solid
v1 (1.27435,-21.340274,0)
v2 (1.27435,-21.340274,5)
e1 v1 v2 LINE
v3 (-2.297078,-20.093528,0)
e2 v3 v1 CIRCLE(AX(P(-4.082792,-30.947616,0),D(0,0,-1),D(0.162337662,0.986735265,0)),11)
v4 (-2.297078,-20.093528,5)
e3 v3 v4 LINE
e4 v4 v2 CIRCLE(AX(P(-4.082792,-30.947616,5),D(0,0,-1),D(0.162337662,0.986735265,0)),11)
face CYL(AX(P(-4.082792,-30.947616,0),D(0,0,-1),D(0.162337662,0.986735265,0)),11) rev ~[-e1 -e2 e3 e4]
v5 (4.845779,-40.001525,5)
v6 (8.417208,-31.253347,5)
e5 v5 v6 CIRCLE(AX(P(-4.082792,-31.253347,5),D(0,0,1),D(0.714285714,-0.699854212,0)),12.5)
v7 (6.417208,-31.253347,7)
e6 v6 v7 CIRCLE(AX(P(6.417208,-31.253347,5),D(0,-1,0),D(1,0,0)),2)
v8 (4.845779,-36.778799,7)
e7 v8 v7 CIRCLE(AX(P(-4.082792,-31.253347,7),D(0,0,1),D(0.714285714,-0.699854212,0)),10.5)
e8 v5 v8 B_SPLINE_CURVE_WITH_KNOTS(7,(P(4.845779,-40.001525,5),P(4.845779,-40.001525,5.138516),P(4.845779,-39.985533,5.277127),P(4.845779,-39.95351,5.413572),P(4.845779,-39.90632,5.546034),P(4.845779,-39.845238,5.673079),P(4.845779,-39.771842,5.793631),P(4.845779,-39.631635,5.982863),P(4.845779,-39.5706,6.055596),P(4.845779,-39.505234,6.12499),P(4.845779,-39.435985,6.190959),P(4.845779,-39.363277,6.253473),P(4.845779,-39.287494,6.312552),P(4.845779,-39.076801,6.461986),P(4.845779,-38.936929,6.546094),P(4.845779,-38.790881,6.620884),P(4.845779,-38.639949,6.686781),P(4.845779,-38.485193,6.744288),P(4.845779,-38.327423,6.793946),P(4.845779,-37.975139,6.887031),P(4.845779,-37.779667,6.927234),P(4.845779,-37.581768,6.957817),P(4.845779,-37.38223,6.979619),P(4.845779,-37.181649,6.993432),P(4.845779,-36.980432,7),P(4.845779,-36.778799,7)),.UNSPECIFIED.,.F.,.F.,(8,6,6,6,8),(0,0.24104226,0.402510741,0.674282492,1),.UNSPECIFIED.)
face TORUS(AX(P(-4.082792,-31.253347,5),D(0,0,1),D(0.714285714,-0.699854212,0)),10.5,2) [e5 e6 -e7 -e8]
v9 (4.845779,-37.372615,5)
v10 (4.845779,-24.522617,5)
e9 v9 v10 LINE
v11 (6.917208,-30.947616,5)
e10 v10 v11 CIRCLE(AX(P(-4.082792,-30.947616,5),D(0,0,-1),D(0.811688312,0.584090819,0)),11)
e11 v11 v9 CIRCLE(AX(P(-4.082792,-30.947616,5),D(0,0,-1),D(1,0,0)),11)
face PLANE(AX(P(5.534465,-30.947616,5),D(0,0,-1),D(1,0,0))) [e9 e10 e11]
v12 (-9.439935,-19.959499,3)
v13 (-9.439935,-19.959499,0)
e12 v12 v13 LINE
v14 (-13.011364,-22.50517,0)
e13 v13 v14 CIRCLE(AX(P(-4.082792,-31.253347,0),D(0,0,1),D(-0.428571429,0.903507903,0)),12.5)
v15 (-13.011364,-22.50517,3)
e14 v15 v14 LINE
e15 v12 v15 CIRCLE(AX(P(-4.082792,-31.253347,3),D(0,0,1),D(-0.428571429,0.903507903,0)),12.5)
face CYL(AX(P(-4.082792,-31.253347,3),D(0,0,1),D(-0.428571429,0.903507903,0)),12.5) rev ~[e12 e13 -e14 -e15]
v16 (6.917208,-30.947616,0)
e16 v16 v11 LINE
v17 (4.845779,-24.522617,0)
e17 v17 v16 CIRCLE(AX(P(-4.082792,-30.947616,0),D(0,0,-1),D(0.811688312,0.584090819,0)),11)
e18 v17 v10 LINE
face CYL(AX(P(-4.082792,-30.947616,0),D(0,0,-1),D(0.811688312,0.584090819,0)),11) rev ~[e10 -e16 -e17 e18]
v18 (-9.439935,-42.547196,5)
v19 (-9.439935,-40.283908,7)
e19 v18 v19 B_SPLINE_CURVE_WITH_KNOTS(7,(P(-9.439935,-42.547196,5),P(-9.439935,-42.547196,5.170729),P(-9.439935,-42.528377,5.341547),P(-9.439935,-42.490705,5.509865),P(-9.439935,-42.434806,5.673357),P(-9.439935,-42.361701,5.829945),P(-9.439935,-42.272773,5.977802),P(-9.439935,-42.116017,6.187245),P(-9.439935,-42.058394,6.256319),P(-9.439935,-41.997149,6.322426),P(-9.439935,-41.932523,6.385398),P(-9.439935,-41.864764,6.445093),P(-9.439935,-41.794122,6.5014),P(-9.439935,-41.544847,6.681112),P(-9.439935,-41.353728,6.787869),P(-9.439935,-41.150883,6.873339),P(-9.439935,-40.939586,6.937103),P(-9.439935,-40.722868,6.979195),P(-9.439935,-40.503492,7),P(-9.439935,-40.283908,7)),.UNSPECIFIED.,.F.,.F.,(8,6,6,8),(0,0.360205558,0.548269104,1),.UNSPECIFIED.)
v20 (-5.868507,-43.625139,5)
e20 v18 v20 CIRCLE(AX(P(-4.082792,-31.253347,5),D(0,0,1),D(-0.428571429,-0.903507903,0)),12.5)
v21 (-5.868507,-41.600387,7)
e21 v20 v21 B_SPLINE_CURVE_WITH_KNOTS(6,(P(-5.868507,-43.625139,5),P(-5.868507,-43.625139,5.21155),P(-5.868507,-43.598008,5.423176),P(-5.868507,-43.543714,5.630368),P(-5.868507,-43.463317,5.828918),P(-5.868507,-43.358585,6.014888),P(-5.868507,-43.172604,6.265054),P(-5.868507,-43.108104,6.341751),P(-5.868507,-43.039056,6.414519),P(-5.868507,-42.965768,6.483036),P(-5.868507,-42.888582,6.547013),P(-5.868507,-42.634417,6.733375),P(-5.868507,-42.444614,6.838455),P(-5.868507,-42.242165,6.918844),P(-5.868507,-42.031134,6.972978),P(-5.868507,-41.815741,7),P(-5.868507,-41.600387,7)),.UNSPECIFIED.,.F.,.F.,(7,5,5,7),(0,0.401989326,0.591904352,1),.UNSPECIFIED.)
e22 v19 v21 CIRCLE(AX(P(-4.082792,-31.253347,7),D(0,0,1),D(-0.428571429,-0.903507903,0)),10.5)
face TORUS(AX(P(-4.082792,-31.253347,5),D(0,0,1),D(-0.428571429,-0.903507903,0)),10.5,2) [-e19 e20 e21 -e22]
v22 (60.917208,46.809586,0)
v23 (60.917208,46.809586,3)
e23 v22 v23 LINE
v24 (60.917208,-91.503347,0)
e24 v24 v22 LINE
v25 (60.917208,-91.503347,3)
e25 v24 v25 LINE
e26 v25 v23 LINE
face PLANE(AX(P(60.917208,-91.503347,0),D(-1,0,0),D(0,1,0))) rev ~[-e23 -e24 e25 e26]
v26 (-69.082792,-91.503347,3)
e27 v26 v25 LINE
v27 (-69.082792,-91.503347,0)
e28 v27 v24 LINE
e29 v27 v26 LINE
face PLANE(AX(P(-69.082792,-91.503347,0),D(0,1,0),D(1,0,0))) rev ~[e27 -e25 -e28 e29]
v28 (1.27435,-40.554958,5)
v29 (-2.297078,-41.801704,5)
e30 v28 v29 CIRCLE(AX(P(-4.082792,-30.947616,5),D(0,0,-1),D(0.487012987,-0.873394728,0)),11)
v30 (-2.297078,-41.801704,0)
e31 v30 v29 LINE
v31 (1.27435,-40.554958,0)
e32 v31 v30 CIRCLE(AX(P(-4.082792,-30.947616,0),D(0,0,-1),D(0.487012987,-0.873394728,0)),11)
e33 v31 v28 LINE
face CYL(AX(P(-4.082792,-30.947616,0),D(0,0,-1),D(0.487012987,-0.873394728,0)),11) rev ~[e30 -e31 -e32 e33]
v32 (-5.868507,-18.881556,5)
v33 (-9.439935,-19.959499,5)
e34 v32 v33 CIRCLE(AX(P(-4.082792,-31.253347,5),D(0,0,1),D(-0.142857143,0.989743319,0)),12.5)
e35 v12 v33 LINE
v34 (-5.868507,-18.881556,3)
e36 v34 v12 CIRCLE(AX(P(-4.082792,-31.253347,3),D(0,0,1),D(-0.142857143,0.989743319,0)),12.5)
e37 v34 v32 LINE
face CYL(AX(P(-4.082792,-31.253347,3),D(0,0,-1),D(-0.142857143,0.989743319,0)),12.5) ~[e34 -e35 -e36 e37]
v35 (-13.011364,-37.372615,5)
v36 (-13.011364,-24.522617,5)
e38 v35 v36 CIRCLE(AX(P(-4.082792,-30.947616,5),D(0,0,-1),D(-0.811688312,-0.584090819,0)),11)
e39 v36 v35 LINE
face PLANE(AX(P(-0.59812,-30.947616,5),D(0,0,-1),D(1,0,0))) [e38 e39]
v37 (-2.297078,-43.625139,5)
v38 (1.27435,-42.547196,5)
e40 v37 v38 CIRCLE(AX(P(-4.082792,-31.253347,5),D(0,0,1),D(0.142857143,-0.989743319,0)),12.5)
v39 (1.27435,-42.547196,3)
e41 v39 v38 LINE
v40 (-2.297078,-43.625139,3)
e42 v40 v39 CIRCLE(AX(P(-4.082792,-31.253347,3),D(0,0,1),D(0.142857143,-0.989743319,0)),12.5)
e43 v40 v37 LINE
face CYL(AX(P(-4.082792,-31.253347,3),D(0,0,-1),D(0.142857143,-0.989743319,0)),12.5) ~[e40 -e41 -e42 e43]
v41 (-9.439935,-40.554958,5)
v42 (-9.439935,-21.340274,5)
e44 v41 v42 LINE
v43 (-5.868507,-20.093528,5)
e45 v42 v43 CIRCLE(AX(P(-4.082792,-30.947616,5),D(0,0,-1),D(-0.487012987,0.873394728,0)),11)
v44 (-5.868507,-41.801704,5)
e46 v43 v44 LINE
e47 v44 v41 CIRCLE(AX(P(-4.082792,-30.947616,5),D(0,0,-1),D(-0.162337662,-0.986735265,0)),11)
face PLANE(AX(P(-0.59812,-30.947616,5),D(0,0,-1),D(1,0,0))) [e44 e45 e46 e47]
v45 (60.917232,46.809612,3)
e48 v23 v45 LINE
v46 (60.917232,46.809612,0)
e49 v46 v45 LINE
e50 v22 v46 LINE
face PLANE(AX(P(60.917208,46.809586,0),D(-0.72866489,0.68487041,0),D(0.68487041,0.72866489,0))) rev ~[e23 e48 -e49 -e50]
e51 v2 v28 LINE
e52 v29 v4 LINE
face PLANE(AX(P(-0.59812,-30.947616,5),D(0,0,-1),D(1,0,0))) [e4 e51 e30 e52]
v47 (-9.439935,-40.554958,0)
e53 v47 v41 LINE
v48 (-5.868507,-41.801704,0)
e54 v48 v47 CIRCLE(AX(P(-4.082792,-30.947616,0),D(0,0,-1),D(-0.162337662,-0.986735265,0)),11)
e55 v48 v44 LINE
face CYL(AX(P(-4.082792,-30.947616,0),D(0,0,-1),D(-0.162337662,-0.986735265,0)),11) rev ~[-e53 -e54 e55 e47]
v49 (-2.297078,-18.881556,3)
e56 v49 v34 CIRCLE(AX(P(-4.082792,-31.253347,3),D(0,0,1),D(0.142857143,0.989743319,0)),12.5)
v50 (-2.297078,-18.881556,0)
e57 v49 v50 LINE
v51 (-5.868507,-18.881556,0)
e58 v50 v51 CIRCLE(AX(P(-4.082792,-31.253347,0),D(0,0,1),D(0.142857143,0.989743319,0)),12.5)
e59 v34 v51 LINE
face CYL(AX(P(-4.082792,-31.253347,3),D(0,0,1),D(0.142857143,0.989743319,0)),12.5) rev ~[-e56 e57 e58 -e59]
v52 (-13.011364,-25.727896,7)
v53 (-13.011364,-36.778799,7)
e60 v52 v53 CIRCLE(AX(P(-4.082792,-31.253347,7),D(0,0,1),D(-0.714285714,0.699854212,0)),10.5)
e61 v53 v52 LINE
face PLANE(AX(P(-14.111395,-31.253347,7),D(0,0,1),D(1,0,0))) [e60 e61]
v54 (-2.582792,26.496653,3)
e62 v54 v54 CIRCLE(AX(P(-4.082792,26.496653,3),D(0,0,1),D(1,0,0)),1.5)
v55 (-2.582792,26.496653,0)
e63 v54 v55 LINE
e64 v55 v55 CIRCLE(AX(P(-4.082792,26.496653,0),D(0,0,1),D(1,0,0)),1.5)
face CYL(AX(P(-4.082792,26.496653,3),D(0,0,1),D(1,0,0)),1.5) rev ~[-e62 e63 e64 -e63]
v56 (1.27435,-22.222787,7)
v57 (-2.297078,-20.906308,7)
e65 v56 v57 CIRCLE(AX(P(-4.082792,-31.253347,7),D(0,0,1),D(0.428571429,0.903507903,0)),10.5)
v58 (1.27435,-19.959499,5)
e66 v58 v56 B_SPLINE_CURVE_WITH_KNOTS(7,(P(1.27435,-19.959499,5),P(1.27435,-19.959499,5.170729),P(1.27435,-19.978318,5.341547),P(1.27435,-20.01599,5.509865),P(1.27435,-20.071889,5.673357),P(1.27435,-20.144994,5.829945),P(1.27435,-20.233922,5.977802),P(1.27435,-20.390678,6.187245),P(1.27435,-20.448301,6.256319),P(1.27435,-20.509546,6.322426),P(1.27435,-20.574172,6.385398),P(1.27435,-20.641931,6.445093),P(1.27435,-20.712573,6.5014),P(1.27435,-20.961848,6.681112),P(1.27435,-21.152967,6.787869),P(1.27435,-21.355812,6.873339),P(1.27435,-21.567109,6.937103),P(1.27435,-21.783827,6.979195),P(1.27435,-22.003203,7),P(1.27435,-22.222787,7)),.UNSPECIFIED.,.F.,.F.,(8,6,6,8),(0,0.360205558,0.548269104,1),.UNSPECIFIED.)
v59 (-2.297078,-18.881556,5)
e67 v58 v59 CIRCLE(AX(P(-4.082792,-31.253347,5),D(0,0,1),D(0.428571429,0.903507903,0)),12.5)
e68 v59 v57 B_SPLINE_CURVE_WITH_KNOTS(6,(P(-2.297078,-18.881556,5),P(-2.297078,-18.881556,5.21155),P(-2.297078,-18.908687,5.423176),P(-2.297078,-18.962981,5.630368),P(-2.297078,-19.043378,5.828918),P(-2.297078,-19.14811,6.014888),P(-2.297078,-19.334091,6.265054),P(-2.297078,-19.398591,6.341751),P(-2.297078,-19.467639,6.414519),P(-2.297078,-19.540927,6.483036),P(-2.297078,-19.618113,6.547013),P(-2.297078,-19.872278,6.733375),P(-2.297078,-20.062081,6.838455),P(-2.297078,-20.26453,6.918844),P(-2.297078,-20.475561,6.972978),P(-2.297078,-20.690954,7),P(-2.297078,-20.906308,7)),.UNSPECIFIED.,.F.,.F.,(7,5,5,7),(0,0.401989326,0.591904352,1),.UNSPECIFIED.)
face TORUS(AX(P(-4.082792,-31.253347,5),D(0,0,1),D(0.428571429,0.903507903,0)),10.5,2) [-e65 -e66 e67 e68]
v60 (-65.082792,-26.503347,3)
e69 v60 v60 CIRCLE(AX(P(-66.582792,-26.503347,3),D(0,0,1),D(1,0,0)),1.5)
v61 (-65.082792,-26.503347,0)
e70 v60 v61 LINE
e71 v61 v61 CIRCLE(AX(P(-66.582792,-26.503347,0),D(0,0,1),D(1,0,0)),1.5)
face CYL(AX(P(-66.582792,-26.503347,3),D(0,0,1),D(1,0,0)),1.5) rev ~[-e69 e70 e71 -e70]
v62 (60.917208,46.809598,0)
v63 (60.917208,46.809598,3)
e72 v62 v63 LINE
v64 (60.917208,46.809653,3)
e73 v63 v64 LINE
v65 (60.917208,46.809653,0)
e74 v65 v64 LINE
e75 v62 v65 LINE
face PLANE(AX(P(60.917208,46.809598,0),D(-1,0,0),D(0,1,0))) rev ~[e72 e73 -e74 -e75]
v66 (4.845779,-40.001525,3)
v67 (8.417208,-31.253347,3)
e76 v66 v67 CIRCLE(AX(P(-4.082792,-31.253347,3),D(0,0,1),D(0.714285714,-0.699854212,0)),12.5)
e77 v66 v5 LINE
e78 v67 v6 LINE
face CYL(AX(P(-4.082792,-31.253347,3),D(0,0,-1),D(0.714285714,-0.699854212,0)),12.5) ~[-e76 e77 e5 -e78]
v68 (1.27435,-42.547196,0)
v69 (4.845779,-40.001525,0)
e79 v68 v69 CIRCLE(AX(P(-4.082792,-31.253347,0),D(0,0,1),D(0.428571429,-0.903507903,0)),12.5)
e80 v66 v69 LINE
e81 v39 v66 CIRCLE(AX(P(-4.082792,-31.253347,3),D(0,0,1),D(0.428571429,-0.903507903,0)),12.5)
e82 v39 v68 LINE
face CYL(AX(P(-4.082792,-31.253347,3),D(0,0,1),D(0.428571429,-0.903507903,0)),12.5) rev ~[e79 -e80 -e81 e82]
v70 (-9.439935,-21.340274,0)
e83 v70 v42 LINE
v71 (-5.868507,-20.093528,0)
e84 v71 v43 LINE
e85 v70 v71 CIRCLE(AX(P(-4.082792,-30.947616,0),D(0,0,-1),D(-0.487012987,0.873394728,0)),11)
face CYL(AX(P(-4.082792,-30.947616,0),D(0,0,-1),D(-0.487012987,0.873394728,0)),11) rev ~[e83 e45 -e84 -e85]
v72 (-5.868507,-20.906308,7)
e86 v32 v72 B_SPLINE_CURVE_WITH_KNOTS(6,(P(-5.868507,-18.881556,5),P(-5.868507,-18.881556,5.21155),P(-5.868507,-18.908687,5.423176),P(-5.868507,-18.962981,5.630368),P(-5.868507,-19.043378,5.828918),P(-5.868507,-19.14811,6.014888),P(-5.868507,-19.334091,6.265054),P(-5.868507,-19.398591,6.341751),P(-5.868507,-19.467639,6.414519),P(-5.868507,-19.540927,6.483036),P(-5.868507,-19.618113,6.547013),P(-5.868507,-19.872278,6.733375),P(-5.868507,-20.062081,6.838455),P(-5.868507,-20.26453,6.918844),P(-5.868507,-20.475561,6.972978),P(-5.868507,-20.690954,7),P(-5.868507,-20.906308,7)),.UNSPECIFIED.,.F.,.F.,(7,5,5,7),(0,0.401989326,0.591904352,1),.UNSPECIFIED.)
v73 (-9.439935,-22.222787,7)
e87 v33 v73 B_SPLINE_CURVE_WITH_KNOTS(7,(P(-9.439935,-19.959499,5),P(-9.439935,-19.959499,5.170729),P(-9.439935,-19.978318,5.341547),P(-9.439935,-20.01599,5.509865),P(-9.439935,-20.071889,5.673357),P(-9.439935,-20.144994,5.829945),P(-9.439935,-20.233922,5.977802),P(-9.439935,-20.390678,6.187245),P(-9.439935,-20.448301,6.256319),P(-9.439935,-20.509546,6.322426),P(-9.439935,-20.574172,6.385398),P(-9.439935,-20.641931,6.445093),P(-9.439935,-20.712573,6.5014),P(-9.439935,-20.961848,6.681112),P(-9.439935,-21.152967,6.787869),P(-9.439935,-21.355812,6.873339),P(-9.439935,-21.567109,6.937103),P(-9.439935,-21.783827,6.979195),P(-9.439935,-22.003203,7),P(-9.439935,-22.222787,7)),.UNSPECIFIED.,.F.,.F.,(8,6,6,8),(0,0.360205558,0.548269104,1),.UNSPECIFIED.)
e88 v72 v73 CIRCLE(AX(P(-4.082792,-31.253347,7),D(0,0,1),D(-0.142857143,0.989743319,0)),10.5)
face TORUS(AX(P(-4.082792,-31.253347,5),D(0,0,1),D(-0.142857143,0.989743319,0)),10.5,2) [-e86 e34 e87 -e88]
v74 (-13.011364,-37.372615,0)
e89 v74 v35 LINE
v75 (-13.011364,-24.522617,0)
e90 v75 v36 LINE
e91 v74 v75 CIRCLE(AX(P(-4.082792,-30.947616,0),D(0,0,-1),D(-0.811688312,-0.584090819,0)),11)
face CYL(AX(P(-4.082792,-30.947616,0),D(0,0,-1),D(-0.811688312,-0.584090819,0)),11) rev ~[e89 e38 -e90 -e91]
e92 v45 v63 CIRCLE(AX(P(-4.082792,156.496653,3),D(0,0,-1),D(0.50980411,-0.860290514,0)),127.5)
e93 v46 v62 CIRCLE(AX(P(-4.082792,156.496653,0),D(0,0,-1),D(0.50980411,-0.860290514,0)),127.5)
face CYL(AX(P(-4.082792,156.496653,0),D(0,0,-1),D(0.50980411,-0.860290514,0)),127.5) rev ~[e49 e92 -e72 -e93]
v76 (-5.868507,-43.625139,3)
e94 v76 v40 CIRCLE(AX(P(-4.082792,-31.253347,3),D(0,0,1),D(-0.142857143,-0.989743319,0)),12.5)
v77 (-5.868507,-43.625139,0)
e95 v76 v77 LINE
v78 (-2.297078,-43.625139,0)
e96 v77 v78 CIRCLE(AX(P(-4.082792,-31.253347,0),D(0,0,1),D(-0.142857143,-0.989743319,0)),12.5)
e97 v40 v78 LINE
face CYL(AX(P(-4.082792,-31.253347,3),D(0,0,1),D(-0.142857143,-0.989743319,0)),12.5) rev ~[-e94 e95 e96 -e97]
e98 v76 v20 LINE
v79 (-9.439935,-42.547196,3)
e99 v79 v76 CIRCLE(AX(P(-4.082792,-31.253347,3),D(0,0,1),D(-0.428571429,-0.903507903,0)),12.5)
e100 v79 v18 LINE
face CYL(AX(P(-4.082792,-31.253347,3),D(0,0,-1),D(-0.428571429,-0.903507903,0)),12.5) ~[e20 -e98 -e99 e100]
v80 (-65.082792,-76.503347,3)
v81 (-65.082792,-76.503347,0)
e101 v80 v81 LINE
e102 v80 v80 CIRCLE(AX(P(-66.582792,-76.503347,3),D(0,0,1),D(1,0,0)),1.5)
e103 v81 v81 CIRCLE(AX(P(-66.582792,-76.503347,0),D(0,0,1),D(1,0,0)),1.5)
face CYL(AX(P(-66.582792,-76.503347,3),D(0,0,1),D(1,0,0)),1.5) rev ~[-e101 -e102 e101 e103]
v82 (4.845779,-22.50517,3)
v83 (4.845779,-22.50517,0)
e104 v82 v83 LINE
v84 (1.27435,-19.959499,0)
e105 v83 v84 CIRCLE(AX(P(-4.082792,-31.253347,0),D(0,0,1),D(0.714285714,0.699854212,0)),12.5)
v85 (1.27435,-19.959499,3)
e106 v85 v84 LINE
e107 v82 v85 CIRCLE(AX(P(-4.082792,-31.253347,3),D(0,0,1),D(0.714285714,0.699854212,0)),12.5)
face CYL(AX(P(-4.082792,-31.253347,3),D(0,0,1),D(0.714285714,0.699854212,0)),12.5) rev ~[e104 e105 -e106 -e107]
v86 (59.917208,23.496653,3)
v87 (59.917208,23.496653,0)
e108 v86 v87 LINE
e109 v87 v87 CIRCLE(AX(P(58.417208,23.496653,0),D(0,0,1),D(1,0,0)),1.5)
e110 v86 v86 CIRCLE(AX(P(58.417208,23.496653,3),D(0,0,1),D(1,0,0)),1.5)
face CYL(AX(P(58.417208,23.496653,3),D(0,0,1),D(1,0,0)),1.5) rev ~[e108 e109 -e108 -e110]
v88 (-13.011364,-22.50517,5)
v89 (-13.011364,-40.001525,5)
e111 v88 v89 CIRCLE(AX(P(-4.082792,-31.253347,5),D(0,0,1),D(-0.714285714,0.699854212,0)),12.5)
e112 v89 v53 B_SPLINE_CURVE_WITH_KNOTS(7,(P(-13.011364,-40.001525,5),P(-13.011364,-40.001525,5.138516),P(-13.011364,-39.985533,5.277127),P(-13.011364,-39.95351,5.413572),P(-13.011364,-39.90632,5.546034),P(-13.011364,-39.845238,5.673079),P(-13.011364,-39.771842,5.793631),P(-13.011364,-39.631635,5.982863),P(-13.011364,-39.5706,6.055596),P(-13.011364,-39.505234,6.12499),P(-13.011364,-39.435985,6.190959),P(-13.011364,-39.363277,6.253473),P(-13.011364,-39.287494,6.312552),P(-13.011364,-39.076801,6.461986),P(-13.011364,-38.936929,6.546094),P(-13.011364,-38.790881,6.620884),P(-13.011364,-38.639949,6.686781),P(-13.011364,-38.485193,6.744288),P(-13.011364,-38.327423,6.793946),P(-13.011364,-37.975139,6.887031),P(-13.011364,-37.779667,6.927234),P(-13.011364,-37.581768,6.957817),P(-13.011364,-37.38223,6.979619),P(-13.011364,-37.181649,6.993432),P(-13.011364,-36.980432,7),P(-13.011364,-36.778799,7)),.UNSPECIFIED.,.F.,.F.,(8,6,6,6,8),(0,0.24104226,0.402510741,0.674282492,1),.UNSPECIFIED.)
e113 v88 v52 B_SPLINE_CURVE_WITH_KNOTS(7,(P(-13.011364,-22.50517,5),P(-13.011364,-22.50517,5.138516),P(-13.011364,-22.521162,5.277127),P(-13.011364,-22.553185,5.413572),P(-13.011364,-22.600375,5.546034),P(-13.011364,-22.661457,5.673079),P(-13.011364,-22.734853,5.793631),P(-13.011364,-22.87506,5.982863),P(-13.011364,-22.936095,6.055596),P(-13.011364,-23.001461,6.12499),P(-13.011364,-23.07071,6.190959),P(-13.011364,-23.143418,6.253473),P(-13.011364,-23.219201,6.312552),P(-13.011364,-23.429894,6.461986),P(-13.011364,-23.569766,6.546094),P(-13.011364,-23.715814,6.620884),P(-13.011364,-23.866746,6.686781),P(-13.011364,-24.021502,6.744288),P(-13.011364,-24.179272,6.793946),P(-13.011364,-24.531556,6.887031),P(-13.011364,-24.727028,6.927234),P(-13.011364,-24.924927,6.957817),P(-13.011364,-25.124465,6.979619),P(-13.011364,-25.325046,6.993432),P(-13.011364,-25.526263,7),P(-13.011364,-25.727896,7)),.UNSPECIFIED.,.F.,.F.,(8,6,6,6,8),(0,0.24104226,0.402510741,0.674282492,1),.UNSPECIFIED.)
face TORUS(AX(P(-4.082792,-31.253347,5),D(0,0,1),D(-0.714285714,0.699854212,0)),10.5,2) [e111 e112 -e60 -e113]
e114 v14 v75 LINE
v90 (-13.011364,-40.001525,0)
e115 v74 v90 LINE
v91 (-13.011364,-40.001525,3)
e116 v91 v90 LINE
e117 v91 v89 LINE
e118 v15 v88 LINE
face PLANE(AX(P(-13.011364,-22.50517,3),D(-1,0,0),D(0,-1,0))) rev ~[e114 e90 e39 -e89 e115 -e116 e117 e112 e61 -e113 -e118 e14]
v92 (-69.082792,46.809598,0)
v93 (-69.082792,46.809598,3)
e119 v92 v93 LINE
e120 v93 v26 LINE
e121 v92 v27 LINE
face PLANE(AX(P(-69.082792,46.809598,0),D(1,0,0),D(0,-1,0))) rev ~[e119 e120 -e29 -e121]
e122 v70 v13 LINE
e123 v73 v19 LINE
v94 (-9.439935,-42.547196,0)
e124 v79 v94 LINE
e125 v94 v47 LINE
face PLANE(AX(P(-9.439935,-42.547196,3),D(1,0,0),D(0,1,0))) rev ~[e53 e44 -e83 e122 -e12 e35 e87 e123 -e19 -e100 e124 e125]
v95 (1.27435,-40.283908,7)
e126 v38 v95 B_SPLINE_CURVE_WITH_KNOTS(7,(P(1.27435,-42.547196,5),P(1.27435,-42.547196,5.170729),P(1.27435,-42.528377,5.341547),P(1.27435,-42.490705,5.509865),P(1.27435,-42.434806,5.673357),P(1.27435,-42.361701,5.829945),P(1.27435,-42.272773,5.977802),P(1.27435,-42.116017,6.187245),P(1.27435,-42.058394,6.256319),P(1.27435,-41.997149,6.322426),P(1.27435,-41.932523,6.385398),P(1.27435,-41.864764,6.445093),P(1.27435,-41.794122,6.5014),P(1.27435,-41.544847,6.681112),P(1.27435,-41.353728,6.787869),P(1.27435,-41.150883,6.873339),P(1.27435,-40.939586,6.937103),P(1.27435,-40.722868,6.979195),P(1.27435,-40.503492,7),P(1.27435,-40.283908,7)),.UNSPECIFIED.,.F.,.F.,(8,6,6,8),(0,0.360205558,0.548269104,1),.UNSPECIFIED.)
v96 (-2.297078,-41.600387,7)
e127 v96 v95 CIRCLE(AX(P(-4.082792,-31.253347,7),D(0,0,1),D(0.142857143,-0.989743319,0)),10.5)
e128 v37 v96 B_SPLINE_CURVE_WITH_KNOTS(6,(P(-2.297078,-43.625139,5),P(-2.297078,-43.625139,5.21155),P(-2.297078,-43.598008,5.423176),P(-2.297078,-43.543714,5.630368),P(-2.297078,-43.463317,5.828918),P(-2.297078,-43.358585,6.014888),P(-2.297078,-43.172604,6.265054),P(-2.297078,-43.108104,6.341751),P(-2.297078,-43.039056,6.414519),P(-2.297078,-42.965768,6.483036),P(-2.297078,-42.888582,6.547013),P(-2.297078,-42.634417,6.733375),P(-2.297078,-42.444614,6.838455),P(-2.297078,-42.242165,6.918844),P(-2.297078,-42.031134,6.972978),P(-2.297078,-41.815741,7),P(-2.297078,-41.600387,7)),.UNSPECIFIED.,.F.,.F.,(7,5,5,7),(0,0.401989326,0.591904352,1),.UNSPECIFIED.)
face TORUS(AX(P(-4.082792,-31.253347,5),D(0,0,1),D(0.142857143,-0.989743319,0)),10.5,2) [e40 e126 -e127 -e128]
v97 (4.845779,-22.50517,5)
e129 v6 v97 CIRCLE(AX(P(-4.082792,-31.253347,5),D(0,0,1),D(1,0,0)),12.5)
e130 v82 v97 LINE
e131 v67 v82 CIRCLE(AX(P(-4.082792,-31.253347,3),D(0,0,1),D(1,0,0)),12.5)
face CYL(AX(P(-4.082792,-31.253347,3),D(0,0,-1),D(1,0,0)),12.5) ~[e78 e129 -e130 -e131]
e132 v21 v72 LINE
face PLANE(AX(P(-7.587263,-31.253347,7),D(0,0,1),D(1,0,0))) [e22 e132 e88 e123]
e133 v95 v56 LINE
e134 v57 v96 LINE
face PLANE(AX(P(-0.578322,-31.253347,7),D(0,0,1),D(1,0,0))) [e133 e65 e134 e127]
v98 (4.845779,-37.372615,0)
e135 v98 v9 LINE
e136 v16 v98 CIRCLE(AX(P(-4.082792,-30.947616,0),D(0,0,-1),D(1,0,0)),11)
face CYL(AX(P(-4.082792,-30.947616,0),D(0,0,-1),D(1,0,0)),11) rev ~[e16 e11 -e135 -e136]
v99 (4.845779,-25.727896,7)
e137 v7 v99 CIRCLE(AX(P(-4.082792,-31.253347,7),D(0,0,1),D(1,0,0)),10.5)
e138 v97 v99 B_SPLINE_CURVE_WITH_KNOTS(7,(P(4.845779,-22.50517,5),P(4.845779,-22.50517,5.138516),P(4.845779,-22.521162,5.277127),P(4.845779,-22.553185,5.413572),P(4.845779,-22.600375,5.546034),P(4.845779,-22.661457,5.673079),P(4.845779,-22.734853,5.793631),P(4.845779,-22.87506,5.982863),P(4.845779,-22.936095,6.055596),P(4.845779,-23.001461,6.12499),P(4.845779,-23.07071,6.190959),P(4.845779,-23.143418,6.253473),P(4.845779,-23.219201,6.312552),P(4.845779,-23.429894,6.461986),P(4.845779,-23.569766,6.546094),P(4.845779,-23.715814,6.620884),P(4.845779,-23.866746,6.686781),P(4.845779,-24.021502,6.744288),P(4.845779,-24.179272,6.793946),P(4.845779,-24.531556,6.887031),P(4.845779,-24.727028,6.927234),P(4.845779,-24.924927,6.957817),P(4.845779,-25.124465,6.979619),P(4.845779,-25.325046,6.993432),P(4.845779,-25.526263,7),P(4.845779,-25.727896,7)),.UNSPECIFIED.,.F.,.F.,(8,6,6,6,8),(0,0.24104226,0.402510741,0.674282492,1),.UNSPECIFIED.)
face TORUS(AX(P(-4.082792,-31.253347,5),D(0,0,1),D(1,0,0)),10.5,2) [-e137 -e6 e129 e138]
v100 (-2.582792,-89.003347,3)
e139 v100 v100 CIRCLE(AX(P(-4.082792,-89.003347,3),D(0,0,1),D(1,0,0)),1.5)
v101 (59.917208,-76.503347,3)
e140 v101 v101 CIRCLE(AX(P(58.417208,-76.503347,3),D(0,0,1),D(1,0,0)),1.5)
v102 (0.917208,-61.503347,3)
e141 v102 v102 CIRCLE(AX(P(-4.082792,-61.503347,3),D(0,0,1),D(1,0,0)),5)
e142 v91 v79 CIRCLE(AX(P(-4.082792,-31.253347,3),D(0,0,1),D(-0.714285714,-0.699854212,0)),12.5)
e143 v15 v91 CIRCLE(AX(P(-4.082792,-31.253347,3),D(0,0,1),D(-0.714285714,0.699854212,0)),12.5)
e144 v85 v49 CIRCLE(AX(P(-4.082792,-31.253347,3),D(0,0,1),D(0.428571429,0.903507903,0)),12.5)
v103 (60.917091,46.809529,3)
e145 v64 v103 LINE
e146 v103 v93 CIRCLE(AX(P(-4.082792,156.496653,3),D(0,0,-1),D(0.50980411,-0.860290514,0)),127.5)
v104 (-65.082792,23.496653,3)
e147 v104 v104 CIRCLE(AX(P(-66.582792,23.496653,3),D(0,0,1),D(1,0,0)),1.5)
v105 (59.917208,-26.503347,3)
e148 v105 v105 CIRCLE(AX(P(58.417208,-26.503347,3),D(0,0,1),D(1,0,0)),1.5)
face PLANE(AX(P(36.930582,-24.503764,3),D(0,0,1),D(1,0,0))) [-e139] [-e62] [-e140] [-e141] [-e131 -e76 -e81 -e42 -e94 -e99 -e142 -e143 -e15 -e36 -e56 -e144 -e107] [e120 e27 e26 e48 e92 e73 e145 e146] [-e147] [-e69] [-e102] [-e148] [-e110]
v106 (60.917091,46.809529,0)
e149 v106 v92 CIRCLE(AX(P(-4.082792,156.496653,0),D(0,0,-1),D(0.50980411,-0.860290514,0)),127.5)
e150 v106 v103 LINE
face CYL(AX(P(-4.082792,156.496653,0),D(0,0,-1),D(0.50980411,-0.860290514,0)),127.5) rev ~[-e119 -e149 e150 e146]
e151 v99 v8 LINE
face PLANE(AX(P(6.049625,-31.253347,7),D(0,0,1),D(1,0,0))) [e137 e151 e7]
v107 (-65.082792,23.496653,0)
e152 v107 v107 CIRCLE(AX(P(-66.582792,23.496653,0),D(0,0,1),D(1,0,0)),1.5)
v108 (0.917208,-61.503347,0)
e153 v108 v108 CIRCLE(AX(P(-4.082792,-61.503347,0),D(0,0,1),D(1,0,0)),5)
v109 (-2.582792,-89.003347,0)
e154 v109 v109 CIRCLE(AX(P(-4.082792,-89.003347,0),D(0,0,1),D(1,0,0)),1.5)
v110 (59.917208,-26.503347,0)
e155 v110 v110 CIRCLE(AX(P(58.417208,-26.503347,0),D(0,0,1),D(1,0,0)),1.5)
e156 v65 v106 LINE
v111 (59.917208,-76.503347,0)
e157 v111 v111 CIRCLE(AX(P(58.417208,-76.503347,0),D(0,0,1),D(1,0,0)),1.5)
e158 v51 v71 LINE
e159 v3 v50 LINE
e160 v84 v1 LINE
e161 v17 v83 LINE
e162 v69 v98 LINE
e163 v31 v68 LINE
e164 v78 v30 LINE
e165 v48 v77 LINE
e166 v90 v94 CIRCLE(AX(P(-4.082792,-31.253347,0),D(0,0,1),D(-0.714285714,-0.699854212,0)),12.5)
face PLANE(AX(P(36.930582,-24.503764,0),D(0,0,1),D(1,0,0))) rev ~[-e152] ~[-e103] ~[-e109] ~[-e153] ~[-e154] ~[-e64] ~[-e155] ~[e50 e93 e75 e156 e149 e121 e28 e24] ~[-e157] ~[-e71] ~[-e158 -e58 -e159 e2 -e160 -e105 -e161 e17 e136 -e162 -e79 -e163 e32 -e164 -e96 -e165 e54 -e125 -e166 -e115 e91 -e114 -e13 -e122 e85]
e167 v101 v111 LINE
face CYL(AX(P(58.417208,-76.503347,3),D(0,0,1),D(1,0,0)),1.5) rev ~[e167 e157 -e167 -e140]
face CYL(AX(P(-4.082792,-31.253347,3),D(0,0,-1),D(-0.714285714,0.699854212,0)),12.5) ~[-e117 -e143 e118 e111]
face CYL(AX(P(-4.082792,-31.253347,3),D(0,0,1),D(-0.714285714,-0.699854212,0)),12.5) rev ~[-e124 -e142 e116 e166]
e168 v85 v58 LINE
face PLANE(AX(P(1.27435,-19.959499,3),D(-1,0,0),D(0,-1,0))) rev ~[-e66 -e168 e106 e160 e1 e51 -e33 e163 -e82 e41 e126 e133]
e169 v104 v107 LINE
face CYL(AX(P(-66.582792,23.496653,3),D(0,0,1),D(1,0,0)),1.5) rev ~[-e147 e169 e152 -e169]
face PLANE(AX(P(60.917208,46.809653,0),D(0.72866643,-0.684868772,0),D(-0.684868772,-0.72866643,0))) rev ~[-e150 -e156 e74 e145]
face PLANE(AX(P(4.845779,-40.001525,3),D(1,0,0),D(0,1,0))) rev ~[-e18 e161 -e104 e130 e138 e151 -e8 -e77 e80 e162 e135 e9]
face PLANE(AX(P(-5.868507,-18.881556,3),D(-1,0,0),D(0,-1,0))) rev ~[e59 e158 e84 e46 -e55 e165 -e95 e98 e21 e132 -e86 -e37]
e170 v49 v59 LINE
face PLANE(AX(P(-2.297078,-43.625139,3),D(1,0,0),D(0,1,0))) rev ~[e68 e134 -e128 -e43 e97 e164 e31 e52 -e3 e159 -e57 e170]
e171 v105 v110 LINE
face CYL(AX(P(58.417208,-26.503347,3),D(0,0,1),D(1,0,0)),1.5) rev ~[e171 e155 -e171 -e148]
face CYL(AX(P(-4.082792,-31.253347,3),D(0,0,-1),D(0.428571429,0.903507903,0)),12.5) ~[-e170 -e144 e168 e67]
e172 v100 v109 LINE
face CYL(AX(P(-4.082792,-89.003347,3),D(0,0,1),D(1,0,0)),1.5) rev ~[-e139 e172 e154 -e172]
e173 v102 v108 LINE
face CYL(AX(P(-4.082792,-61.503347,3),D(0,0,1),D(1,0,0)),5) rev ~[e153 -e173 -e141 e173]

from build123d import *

# Parameters (mm, degrees)
F1_DEPTH  = 3
F2_R      = 1.5
F3_DEPTH  = 25
F5_DEPTH  = 4
F6_DEPTH  = 25
F7_R      = 2
F9_DEPTH  = 5
F10_R     = 5
F11_DEPTH = 25


# Not quite as in the source:
# - ends of sketch curves that miss each other by under 0.0002 mm in the source are joined


with BuildPart() as f1:
    # F0 (on Top) → F1 (new body)
    with BuildSketch(Plane.XY):
        with BuildLine():
            ThreePointArc((49.2280806434, 33.0130470502), (48.1713658013, 32.5621821126), (47.1108383201, 32.1203598507))
            Line((47.1108383201, 32.1203598507), (-4.1065374511, -22.3721440377))
            Line((-4.1065374511, -22.3721440377), (54.4172076095, -84.5927516487))
            Line((54.4172076095, -84.5927516487), (54.4172076095, 33.0130470502))
            Line((54.4172076095, 33.0130470502), (49.2280806434, 33.0130470502))
        make_face()
        Polygon((-4.1065374511, -22.3721440377), (-62.5827923905, -84.587700803), (-62.5827923905, -85.003347494), (54.4172076095, -85.003347494), (54.4172076095, -84.5927516487), align=None)
        with BuildLine():
            Line((-62.5827923905, 33.0130470502), (-62.5827923905, -84.587700803))
            Line((-62.5827923905, -84.587700803), (-4.1065374511, -22.3721440377))
            Line((-4.1065374511, -22.3721440377), (-55.4151337668, 32.1775440438))
            ThreePointArc((-55.4151337668, 32.1775440438), (-56.406067296, 32.5913463114), (-57.3936654243, 33.0130470502))
            Line((-57.3936654243, 33.0130470502), (-62.5827923905, 33.0130470502))
        make_face()
        with BuildLine():
            Line((-4.1065374511, -22.3721440377), (47.1108383201, 32.1203598507))
            ThreePointArc((47.1108383201, 32.1203598507), (-4.1578101896, 21.9966734267), (-55.4151337668, 32.1775440438))
            Line((-55.4151337668, 32.1775440438), (-4.1065374511, -22.3721440377))
        make_face()
        with BuildLine():
            ThreePointArc((60.9172316623, 46.8096119171), (-4.082778411, 28.996652506), (-69.0827923905, 46.8095976636))
            Line((-69.0827923905, 46.8095976636), (-69.0827923905, -91.503347494))
            Line((-69.0827923905, -91.503347494), (-62.5827923905, -84.587700803))
            Line((-62.5827923905, -84.587700803), (-62.5827923905, 33.0130470502))
            Line((-62.5827923905, 33.0130470502), (-57.3936654243, 33.0130470502))
            ThreePointArc((-57.3936654243, 33.0130470502), (-56.406067296, 32.5913463114), (-55.4151337668, 32.1775440438))
            ThreePointArc((-55.4151337668, 32.1775440438), (-4.1578101896, 21.9966734267), (47.1108383201, 32.1203598507))
            Line((47.1108383201, 32.1203598507), (60.9172316623, 46.8096119171))
        make_face()
        with BuildLine():
            Line((60.9172076095, -91.503347494), (60.9172076095, 46.809652506))
            Line((60.9172076095, 46.809652506), (47.1108383201, 32.1203598507))
            ThreePointArc((47.1108383201, 32.1203598507), (48.1713658013, 32.5621821126), (49.2280806434, 33.0130470502))
            Line((49.2280806434, 33.0130470502), (54.4172076095, 33.0130470502))
            Line((54.4172076095, 33.0130470502), (54.4172076095, -84.5927516487))
            Line((54.4172076095, -84.5927516487), (60.9172076095, -91.503347494))
        make_face()
        Polygon((-62.5827923905, -84.587700803), (-69.0827923905, -91.503347494), (60.9172076095, -91.503347494), (54.4172076095, -84.5927516487), (54.4172076095, -85.003347494), (-62.5827923905, -85.003347494), align=None)
    extrude(amount=F1_DEPTH)

    # F2 (on face) → F3 (cut)
    with BuildSketch(Plane.XY.offset(3)):
        with Locations((58.4172076095, -76.503347494)):
            Circle(F2_R)
        with Locations((58.4172076095, -26.503347494)):
            Circle(F2_R)
        with Locations((58.4172076095, 23.496652506)):
            Circle(F2_R)
        with Locations((-4.0827923905, 26.496652506)):
            Circle(F2_R)
        with Locations((-66.5827923905, -76.503347494)):
            Circle(F2_R)
        with Locations((-4.0827923905, -89.003347494)):
            Circle(F2_R)
        with Locations((-66.5827923905, -26.503347494)):
            Circle(F2_R)
        with Locations((-66.5827923905, 23.496652506)):
            Circle(F2_R)
    extrude(amount=-F3_DEPTH, mode=Mode.SUBTRACT)

    # F4 (on face) → F5 (join)
    with BuildSketch(Plane.XY.offset(3)):
        with BuildLine():
            Line((-13.011363819, -40.0015251468), (-13.011363819, -22.5051698412))
            ThreePointArc((-13.011363819, -22.5051698412), (-16.5827923905, -31.253347494), (-13.011363819, -40.0015251468))
        make_face()
        with BuildLine():
            ThreePointArc((4.8457790381, -40.0015251468), (7.4899588567, -35.9779034066), (8.4172076095, -31.253347494))
            ThreePointArc((8.4172076095, -31.253347494), (7.4899588567, -26.5287915814), (4.8457790381, -22.5051698412))
            Line((4.8457790381, -22.5051698412), (4.8457790381, -40.0015251468))
        make_face()
        with BuildLine():
            Line((1.2743504667, -42.5471962803), (1.2743504667, -19.9594987077))
            ThreePointArc((1.2743504667, -19.9594987077), (-0.4709241544, -19.2865430816), (-2.2970781048, -18.8815560114))
            Line((-2.2970781048, -18.8815560114), (-2.2970781048, -43.6251389767))
            ThreePointArc((-2.2970781048, -43.6251389767), (-0.4709241544, -43.2201519064), (1.2743504667, -42.5471962803))
        make_face()
        with BuildLine():
            Line((-5.8685066762, -43.6251389767), (-5.8685066762, -18.8815560114))
            ThreePointArc((-5.8685066762, -18.8815560114), (-7.6946606266, -19.2865430816), (-9.4399352476, -19.9594987077))
            Line((-9.4399352476, -19.9594987077), (-9.4399352476, -42.5471962803))
            ThreePointArc((-9.4399352476, -42.5471962803), (-7.6946606266, -43.2201519064), (-5.8685066762, -43.6251389767))
        make_face()
    extrude(amount=F5_DEPTH)

    # F4 (on face) → F6 (cut)
    with BuildSketch(Plane.XY.offset(3)):
        with BuildLine():
            Line((-9.4399352476, -42.5471962803), (-9.4399352476, -19.9594987077))
            ThreePointArc((-9.4399352476, -19.9594987077), (-11.3381709845, -21.0744732215), (-13.011363819, -22.5051698412))
            Line((-13.011363819, -22.5051698412), (-13.011363819, -40.0015251468))
            ThreePointArc((-13.011363819, -40.0015251468), (-11.3381709845, -41.4322217666), (-9.4399352476, -42.5471962803))
        make_face()
        with BuildLine():
            Line((-2.2970781048, -43.6251389767), (-2.2970781048, -18.8815560114))
            ThreePointArc((-2.2970781048, -18.8815560114), (-4.0827923905, -18.753347494), (-5.8685066762, -18.8815560114))
            Line((-5.8685066762, -18.8815560114), (-5.8685066762, -43.6251389767))
            ThreePointArc((-5.8685066762, -43.6251389767), (-4.0827923905, -43.753347494), (-2.2970781048, -43.6251389767))
        make_face()
        with BuildLine():
            Line((4.8457790381, -40.0015251468), (4.8457790381, -22.5051698412))
            ThreePointArc((4.8457790381, -22.5051698412), (3.1725862036, -21.0744732215), (1.2743504667, -19.9594987077))
            Line((1.2743504667, -19.9594987077), (1.2743504667, -42.5471962803))
            ThreePointArc((1.2743504667, -42.5471962803), (3.1725862036, -41.4322217666), (4.8457790381, -40.0015251468))
        make_face()
    extrude(amount=-F6_DEPTH, mode=Mode.SUBTRACT)

    # F7
    f7_edges = [f1.edges().sort_by_distance(p)[0] for p in [
        (-7.694661, -19.286543, 7),
        (-16.582792, -31.253347, 7),
        (-0.470924, -19.286543, 7),
        (8.417208, -31.253347, 7),
        (-0.470924, -43.220152, 7),
        (-7.694661, -43.220152, 7),
    ]]
    fillet(f7_edges, radius=F7_R)

    # F8 (on face) → F9 (cut)
    with BuildSketch(Plane(origin=(0, 0, 0), x_dir=(1, 0, 0), z_dir=(0, 0, -1))):
        with BuildLine():
            ThreePointArc((4.8457790381, 24.5226173164), (6.3865506098, 27.5722856522), (6.9172076095, 30.9476163238))
            ThreePointArc((6.9172076095, 30.9476163238), (6.3865506098, 34.3229469955), (4.8457790381, 37.3726153312))
            Line((4.8457790381, 37.3726153312), (4.8457790381, 24.5226173164))
        make_face()
        with BuildLine():
            Line((1.2743504667, 21.3402743185), (1.2743504667, 40.5549583292))
            ThreePointArc((1.2743504667, 40.5549583292), (-0.4573688452, 41.3330052967), (-2.2970781048, 41.8017042399))
            Line((-2.2970781048, 41.8017042399), (-2.2970781048, 20.0935284078))
            ThreePointArc((-2.2970781048, 20.0935284078), (-0.4573688452, 20.562227351), (1.2743504667, 21.3402743185))
        make_face()
        with BuildLine():
            Line((-2.2970781048, 20.0935284078), (-2.2970781048, 41.8017042399))
            ThreePointArc((-2.2970781048, 41.8017042399), (-4.0827923905, 41.9476163238), (-5.8685066762, 41.8017042399))
            Line((-5.8685066762, 41.8017042399), (-5.8685066762, 20.0935284078))
            ThreePointArc((-5.8685066762, 20.0935284078), (-4.0827923905, 19.9476163238), (-2.2970781048, 20.0935284078))
        make_face()
        with BuildLine():
            Line((-5.8685066762, 20.0935284078), (-5.8685066762, 41.8017042399))
            ThreePointArc((-5.8685066762, 41.8017042399), (-7.7082159357, 41.3330052967), (-9.4399352476, 40.5549583292))
            Line((-9.4399352476, 40.5549583292), (-9.4399352476, 21.3402743185))
            ThreePointArc((-9.4399352476, 21.3402743185), (-7.7082159357, 20.562227351), (-5.8685066762, 20.0935284078))
        make_face()
        with BuildLine():
            Line((-9.4399352476, 21.3402743185), (-9.4399352476, 40.5549583292))
            ThreePointArc((-9.4399352476, 40.5549583292), (-11.4007316429, 39.1602751562), (-13.011363819, 37.3726153312))
            Line((-13.011363819, 37.3726153312), (-13.011363819, 24.5226173164))
            ThreePointArc((-13.011363819, 24.5226173164), (-11.4007316429, 22.7349574914), (-9.4399352476, 21.3402743185))
        make_face()
        with BuildLine():
            Line((-13.011363819, 24.5226173164), (-13.011363819, 37.3726153312))
            ThreePointArc((-13.011363819, 37.3726153312), (-15.0827923905, 30.9476163238), (-13.011363819, 24.5226173164))
        make_face()
    extrude(amount=-F9_DEPTH, mode=Mode.SUBTRACT)

    # F10 (on face) → F11 (cut)
    with BuildSketch(Plane.XY.offset(3)):
        with Locations((-4.0827923905, -61.503347494)):
            Circle(F10_R)
    extrude(amount=-F11_DEPTH, mode=Mode.SUBTRACT)


solid = f1.part
